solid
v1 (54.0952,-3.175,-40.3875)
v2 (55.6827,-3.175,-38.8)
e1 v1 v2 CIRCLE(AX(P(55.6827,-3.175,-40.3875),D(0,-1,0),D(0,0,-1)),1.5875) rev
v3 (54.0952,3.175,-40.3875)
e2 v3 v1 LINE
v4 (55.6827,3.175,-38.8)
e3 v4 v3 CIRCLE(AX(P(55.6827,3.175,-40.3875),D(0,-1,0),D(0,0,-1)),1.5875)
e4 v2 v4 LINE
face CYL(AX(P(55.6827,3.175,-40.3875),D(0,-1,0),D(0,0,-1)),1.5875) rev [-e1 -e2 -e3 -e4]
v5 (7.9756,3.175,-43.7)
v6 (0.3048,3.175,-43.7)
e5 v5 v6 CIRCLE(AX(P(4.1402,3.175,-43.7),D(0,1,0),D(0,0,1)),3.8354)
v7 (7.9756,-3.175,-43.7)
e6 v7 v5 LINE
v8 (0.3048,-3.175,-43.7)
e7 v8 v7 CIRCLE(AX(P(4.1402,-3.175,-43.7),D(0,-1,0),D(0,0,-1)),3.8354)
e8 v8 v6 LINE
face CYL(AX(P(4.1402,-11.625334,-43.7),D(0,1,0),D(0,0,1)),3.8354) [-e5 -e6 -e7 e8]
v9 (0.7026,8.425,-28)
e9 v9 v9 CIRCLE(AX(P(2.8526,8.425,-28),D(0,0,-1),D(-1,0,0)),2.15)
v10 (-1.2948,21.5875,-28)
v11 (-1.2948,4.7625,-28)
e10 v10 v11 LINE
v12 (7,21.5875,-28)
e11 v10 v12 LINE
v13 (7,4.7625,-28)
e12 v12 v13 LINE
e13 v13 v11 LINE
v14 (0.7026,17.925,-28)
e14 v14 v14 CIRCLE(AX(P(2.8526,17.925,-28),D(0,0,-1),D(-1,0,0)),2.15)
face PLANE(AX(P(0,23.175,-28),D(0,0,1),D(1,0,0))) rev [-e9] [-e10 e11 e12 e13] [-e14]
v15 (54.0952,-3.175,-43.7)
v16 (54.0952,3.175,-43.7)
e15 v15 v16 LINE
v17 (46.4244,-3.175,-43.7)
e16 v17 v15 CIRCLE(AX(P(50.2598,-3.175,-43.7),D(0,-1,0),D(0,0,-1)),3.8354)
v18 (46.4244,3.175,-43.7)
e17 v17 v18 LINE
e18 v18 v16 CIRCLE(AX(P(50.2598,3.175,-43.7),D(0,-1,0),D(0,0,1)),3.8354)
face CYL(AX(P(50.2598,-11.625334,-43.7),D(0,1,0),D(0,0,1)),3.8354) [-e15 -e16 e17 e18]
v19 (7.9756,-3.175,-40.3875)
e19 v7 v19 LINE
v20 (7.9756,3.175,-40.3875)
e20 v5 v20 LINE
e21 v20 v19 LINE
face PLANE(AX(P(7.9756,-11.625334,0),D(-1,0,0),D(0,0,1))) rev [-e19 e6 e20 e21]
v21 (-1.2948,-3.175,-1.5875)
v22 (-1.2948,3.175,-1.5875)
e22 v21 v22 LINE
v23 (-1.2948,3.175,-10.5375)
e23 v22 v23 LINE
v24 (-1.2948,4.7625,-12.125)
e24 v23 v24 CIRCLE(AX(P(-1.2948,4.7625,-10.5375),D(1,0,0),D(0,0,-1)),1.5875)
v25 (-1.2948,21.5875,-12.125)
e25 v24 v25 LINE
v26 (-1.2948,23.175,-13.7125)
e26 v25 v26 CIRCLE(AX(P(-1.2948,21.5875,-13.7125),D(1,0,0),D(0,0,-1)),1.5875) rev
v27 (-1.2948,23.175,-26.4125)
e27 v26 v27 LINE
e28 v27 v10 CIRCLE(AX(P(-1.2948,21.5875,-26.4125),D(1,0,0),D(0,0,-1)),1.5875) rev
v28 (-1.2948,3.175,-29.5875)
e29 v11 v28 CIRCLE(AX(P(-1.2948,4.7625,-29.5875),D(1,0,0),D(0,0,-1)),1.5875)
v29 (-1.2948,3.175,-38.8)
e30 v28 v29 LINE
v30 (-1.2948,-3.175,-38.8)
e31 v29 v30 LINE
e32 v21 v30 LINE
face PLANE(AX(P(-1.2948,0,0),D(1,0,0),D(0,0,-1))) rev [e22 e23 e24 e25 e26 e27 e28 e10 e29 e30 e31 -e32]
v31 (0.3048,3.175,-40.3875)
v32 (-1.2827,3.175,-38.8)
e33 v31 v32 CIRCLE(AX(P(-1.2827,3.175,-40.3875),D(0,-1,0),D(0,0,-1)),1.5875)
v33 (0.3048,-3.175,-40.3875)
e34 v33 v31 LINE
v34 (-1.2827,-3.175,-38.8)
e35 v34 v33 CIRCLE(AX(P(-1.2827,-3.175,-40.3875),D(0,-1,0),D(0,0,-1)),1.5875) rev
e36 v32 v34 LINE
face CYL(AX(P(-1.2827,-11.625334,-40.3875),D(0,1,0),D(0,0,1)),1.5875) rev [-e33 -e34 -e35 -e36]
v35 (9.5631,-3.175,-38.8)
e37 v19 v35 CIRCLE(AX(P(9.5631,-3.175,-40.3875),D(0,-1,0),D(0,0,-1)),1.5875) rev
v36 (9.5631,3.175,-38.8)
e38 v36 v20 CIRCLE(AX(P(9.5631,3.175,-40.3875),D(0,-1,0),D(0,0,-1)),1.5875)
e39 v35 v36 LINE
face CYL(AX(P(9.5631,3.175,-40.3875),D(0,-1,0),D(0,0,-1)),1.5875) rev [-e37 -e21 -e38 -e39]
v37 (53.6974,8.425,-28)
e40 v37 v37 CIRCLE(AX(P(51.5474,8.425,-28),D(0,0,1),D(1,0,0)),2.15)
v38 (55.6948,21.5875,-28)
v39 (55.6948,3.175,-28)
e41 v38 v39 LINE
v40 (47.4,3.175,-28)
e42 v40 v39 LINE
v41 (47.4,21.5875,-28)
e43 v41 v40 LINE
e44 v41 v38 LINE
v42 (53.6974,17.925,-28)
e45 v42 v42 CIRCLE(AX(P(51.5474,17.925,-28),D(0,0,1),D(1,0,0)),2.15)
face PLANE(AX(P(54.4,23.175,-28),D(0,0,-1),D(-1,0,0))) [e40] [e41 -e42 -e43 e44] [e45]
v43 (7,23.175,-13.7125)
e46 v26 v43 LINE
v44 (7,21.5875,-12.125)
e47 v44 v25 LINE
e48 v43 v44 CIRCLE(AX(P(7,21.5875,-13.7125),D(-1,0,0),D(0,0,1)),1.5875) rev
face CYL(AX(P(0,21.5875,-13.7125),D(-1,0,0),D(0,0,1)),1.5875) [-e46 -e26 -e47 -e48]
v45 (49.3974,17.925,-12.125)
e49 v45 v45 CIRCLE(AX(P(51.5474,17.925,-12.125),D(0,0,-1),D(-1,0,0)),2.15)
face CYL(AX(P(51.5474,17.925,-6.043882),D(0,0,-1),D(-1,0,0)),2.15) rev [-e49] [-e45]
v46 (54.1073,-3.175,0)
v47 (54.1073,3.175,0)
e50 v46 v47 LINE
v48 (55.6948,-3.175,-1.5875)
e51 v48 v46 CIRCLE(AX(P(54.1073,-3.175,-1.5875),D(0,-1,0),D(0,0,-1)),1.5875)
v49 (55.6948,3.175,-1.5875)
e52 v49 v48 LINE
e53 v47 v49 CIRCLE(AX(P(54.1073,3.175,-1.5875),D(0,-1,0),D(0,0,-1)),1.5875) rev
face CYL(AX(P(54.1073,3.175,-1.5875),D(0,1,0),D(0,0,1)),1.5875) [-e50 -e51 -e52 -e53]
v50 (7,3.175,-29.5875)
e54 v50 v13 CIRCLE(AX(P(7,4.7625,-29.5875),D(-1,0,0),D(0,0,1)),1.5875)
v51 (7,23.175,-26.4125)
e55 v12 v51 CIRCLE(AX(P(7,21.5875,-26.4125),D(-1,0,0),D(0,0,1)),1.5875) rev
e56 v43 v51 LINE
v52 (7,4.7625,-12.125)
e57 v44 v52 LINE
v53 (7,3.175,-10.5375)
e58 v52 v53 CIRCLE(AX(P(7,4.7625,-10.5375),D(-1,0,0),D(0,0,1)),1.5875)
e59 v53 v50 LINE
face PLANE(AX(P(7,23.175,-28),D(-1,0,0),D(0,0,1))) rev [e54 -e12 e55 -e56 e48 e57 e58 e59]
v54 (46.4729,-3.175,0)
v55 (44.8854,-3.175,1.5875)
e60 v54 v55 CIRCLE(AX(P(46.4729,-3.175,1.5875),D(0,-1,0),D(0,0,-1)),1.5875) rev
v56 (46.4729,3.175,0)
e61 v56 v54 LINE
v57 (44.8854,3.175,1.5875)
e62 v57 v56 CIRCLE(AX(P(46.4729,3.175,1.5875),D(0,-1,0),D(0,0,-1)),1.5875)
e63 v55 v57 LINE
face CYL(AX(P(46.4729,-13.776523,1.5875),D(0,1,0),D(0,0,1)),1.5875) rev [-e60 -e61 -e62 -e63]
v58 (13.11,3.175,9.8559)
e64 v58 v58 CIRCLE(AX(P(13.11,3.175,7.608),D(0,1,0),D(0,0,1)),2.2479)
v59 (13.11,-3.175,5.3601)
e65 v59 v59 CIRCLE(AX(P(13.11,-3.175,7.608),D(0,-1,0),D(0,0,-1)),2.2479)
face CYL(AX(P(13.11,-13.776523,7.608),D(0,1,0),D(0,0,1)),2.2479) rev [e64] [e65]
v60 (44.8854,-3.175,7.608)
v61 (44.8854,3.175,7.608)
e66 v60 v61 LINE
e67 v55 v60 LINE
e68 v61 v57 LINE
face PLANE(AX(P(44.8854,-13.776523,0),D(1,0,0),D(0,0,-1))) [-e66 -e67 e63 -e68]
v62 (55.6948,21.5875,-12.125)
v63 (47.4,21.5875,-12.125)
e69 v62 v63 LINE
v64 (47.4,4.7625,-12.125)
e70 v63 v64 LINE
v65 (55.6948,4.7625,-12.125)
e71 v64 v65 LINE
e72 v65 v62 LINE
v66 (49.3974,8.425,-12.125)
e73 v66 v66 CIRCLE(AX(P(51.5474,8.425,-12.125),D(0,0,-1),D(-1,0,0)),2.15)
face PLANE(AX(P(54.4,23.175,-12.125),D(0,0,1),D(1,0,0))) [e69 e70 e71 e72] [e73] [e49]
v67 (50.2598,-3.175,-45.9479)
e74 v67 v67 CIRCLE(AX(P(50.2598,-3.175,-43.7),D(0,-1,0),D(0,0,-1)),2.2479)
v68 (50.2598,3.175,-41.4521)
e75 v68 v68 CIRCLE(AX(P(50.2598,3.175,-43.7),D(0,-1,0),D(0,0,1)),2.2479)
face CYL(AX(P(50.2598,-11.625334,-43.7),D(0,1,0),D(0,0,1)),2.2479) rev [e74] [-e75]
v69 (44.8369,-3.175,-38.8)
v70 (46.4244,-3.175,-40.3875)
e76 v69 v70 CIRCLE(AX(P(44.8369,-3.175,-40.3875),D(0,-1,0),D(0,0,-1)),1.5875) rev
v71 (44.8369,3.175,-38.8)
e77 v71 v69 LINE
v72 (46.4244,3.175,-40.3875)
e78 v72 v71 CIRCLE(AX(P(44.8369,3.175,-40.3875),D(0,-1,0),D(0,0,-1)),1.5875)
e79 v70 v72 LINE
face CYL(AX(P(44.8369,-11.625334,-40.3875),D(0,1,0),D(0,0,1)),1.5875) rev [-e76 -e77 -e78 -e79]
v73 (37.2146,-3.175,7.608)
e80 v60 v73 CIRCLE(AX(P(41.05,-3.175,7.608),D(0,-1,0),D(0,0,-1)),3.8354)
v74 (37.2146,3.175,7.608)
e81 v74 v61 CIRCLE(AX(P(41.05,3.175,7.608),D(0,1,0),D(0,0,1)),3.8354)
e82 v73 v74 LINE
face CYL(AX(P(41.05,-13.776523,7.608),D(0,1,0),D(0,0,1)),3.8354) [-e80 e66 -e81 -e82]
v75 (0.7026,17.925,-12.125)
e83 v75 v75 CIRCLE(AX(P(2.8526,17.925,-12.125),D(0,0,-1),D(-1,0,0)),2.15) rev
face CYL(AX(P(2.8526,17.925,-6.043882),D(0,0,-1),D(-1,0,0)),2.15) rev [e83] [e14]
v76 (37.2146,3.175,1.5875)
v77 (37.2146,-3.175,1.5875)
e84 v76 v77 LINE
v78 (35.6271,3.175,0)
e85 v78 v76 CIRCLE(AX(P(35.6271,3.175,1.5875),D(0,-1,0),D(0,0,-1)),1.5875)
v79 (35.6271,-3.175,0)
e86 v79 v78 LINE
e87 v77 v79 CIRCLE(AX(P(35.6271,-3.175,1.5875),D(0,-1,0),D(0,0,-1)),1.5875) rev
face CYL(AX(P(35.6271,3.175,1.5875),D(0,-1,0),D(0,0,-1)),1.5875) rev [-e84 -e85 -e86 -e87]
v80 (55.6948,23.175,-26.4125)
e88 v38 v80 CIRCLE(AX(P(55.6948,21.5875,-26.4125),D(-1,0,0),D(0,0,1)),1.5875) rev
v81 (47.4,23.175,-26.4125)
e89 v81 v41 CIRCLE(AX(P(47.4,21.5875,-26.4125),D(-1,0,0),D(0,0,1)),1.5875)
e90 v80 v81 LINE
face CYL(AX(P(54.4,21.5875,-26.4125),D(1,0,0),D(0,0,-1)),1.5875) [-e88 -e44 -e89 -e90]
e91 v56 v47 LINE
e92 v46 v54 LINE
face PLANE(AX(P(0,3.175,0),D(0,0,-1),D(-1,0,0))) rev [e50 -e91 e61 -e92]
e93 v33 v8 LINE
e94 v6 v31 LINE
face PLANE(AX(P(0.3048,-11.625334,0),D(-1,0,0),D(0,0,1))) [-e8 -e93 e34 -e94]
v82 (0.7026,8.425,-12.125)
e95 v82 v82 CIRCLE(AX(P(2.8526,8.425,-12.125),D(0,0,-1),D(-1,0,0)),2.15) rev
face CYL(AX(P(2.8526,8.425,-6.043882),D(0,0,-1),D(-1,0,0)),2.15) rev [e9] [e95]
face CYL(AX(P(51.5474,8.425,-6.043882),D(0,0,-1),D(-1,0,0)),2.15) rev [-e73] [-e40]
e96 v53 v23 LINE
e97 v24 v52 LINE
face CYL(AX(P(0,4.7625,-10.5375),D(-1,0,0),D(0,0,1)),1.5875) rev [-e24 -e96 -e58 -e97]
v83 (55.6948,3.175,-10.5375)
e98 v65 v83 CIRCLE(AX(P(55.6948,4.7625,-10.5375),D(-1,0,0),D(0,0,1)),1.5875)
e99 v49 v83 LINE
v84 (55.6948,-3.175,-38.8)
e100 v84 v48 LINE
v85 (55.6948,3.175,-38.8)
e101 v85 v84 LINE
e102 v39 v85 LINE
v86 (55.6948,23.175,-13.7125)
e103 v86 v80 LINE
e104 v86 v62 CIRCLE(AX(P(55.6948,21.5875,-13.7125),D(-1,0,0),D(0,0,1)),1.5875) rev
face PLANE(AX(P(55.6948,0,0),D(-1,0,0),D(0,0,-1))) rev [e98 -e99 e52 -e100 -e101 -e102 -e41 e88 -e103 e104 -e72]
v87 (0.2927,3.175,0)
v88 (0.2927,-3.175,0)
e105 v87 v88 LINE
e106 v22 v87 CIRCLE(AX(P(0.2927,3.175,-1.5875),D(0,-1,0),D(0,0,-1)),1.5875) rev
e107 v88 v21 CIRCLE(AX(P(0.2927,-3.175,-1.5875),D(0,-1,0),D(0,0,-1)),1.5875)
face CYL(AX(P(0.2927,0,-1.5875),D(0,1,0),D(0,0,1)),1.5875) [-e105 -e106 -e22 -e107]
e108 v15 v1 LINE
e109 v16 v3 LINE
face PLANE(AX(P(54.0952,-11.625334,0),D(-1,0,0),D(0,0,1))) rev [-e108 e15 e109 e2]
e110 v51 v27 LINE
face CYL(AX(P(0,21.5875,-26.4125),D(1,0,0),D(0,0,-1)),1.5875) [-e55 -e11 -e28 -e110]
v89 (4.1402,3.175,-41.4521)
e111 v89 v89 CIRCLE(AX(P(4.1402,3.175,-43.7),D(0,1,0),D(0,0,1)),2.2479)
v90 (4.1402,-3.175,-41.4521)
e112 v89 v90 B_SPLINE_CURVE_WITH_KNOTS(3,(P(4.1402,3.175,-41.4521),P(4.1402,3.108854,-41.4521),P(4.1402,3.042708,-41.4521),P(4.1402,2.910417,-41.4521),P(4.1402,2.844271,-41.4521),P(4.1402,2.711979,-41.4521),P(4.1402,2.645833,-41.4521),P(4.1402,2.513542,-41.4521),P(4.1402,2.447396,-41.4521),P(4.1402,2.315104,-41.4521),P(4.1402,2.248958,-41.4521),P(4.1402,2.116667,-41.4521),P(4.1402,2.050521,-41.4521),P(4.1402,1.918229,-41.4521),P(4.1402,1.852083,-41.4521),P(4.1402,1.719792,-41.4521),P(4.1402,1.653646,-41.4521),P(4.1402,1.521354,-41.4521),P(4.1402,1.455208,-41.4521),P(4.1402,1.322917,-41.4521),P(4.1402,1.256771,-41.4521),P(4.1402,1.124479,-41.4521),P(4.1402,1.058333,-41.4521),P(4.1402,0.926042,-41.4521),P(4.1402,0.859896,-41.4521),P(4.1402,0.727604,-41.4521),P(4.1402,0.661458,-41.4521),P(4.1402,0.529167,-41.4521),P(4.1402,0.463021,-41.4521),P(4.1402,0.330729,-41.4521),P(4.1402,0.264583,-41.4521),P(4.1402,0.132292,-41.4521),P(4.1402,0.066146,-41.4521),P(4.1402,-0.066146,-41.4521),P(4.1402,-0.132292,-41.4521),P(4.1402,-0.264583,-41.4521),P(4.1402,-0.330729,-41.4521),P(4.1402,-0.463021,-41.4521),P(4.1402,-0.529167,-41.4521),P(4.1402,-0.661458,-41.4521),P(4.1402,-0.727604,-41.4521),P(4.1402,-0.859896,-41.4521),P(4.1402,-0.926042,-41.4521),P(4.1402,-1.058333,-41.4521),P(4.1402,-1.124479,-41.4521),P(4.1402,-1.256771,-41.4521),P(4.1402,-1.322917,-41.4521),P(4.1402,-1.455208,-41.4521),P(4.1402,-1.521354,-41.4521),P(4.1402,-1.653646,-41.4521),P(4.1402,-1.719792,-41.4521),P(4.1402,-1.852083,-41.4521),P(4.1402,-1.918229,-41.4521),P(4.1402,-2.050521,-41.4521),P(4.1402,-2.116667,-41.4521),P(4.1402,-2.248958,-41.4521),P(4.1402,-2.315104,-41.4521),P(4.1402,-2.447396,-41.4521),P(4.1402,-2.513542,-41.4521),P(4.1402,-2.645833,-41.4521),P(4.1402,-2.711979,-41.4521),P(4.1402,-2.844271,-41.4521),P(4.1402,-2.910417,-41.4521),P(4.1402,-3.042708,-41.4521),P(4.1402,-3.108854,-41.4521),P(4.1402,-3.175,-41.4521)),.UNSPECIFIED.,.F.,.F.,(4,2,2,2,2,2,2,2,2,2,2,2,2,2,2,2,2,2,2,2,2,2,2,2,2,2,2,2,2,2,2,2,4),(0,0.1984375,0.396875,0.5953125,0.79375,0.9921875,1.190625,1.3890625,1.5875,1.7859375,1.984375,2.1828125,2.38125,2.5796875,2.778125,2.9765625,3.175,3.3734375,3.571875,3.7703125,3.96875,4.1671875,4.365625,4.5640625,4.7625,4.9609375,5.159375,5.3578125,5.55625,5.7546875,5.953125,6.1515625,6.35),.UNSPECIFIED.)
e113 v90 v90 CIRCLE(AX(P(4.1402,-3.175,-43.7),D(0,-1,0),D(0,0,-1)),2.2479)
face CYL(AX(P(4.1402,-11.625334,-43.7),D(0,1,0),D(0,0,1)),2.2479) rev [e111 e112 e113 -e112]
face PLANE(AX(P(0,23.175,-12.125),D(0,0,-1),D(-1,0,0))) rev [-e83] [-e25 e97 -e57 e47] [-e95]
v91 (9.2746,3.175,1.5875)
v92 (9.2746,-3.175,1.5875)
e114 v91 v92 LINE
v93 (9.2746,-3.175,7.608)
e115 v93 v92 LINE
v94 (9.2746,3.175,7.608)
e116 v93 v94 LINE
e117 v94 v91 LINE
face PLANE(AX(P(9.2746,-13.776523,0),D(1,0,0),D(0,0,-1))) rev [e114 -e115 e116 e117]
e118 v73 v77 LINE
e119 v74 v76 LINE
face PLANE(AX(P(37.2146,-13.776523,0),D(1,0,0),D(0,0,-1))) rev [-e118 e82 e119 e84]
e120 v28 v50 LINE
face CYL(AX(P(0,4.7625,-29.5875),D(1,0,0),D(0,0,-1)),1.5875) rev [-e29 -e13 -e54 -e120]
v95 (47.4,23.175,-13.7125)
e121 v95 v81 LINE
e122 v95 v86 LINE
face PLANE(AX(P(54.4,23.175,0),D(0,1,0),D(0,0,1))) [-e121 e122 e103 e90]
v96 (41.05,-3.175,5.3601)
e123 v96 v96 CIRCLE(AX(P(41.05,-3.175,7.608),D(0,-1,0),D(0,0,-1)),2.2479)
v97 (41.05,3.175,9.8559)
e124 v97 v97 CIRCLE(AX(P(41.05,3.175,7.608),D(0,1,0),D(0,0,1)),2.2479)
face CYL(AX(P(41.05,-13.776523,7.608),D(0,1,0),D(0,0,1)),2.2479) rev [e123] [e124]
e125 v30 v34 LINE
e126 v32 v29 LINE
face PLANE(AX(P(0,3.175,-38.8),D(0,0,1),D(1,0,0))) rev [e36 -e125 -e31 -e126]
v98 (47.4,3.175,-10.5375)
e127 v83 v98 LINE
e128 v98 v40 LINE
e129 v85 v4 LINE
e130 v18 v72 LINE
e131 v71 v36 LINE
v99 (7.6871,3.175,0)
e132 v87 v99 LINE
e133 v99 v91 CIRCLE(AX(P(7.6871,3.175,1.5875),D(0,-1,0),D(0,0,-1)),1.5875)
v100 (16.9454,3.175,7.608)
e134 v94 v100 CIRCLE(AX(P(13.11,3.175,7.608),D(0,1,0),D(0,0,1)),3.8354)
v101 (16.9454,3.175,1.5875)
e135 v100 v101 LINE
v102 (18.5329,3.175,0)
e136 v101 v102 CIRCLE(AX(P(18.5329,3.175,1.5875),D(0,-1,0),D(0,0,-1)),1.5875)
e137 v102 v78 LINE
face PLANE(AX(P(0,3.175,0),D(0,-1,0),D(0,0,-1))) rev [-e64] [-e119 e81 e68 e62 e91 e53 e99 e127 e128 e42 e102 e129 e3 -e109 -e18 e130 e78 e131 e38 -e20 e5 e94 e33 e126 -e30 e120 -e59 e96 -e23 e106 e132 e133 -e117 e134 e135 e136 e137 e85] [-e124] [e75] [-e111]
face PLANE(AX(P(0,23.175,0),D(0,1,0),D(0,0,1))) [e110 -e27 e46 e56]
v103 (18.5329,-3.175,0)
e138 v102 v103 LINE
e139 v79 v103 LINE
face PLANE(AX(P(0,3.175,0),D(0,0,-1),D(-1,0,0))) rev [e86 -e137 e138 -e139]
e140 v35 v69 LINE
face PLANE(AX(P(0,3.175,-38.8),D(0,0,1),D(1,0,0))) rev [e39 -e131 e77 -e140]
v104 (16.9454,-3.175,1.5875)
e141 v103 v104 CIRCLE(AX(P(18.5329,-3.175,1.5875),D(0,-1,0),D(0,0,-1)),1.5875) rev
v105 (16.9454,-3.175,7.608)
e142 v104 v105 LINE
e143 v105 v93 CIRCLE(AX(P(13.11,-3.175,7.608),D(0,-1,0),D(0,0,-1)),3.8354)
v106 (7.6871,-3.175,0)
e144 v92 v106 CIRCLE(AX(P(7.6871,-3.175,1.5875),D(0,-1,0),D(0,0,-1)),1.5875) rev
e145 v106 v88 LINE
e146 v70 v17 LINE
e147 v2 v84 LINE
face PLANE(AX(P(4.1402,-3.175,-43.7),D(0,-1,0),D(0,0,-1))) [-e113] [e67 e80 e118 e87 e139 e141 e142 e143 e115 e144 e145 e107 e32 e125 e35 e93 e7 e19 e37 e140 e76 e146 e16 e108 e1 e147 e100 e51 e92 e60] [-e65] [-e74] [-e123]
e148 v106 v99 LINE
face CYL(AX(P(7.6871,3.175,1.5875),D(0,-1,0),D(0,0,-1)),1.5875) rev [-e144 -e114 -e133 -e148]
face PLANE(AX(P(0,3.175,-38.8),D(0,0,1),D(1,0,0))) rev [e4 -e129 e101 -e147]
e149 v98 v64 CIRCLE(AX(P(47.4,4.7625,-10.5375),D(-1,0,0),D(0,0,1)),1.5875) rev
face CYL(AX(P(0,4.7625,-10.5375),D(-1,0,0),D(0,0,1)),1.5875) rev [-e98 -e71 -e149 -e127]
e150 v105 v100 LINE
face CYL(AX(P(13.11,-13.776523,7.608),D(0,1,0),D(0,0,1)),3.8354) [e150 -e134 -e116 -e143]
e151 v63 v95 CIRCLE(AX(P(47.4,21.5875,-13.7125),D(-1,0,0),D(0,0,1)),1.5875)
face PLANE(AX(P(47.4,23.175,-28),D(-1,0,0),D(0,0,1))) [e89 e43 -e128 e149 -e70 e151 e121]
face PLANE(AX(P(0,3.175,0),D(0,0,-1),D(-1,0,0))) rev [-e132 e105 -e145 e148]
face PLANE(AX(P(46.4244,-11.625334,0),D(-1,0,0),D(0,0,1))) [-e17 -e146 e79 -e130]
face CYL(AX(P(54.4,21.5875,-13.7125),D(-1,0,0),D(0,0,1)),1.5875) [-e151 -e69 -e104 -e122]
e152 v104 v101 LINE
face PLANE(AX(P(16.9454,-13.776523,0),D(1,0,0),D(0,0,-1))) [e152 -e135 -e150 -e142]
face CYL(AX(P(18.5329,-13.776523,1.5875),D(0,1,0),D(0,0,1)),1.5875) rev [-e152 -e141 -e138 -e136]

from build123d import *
from build123d.topology import SkipClean

# Parameters (mm, degrees)
SKETCH1_W           = 54.4
SKETCH1_H           = 38.8
BOSS_EXTRUDE1_DEPTH = 3.175
SKETCH2_W           = 7
SKETCH2_H           = 15.875
BOSS_EXTRUDE2_DEPTH = 20
SKETCH3_R           = 3.8354
SKETCH3_R_2         = 2.2479
BOSS_EXTRUDE3_DEPTH = 3.175
LPATTERN1_COUNT     = 2
LPATTERN1_PITCH     = 27.94
SKETCH6_R           = 3.8354
SKETCH6_R_2         = 2.2479
BOSS_EXTRUDE6_DEPTH = 3.175
SKETCH7_R           = 2.150000018
CUT_EXTRUDE1_DEPTH  = 15.875
BOSS_EXTRUDE7_DEPTH = 1.2948
SKETCH11_R          = 2.2479
BOSS_EXTRUDE8_DEPTH = 3.175
FILLET1_R           = 1.5875


with BuildPart() as part:
    # Sketch1 → Boss-Extrude1 (new body)
    with BuildSketch(Plane(origin=(0, 0, 0), x_dir=(1, 0, 0), z_dir=(0, 1, 0))):
        with Locations((27.2, 19.4)):
            Rectangle(SKETCH1_W, SKETCH1_H)
    extrude(amount=BOSS_EXTRUDE1_DEPTH)

    # Sketch2 → Boss-Extrude2 (add)
    with BuildSketch(Plane(origin=(0, 3.175, 0), x_dir=(1, 0, 0), z_dir=(0, 1, 0))):
        with Locations((3.5, 20.0625)):
            Rectangle(SKETCH2_W, SKETCH2_H)
    boss_extrude2 = extrude(amount=BOSS_EXTRUDE2_DEPTH)

    # Mirror1: Boss-Extrude2 across plane
    add(boss_extrude2.mirror(Plane.ZY.offset(-27.2)))

    # Sketch3 → Boss-Extrude3 (add)
    # profile 1 of 2: a face of its own
    with BuildSketch(Plane(origin=(0, 3.175, 0), x_dir=(1, 0, 0), z_dir=(0, 1, 0))):
        with Locations((13.109999942, -7.608)):
            Circle(SKETCH3_R)
        with Locations(Location((13.109999942, -7.608, 0), (0, 0, 270))):
            Circle(SKETCH3_R_2, mode=Mode.SUBTRACT)
    # profile 2 of 2: a face of its own
    with BuildSketch(Plane(origin=(0, 3.175, 0), x_dir=(1, 0, 0), z_dir=(0, 1, 0))):
        with BuildLine():
            Line((9.274599942, 0), (9.274599942, -7.608))
            ThreePointArc((9.274599942, -7.608), (13.109999942, -3.7726), (16.945399942, -7.608))
            Line((16.945399942, -7.608), (16.945399942, 0))
            Line((16.945399942, 0), (9.274599942, 0))
        make_face()
    boss_extrude3 = extrude(amount=-BOSS_EXTRUDE3_DEPTH)

    # LPattern1: Boss-Extrude3 ×2
    with Locations(*[(i * LPATTERN1_PITCH, 0, 0) for i in range(1, LPATTERN1_COUNT)]):
        add(boss_extrude3)

    # Sketch6 → Boss-Extrude6 (add)
    # profile 1 of 2: a face of its own
    with BuildSketch(Plane(origin=(0, 3.175, 0), x_dir=(1, 0, 0), z_dir=(0, 1, 0))):
        with Locations((4.1402, 43.7)):
            Circle(SKETCH6_R)
        with Locations(Location((4.1402, 43.7, 0), (0, 0, 270))):
            Circle(SKETCH6_R_2, mode=Mode.SUBTRACT)
    # profile 2 of 2: a face of its own
    with BuildSketch(Plane(origin=(0, 3.175, 0), x_dir=(1, 0, 0), z_dir=(0, 1, 0))):
        with BuildLine():
            ThreePointArc((7.9756, 43.7), (4.1402, 39.8646), (0.3048, 43.7))
            Line((0.3048, 43.7), (0.3048, 38.8))
            Line((0.3048, 38.8), (7.9756, 38.8))
            Line((7.9756, 38.8), (7.9756, 43.7))
        make_face()
    boss_extrude6 = extrude(amount=-BOSS_EXTRUDE6_DEPTH)

    # Mirror3: Boss-Extrude6 across plane
    add(boss_extrude6.mirror(Plane.ZY.offset(-27.2)))

    # Sketch7 → Cut-Extrude1 (cut)
    with BuildSketch(Plane(origin=(0, 0, -28), x_dir=(-1, 0, 0), z_dir=(0, 0, -1))):
        with Locations((-2.852600116, 17.925)):
            Circle(SKETCH7_R)
        with Locations((-2.852600116, 8.425)):
            Circle(SKETCH7_R)
    cut_extrude1 = extrude(amount=-CUT_EXTRUDE1_DEPTH, mode=Mode.SUBTRACT)

    # Sketch9 → Boss-Extrude7 (add)
    with BuildSketch(Plane.ZY):
        Polygon((-38.8, 0), (-38.8, 3.175), (-28, 3.175), (-28, 23.175), (-12.125, 23.175), (-12.125, 3.175), (0, 3.175), (0, 0), align=None)
    boss_extrude7 = extrude(amount=BOSS_EXTRUDE7_DEPTH)

    # Mirror4: Boss-Extrude7 across plane
    add(boss_extrude7.mirror(Plane.ZY.offset(-27.2)))

    # Mirror5: Cut-Extrude1 across plane
    add(cut_extrude1.mirror(Plane.ZY.offset(-27.2)), mode=Mode.SUBTRACT)

    # Sketch11 → Boss-Extrude8 (add)
    with SkipClean():  # the faces are left unmerged after this step: merging them gives an invalid solid
        with BuildSketch(Plane.XZ):
            with BuildLine():
                Line((0.3048, -38.8), (0.3048, -43.7))
                ThreePointArc((0.3048, -43.7), (4.1402, -47.5354), (7.9756, -43.7))
                Line((7.9756, -43.7), (7.9756, -38.8))
                Line((7.9756, -38.8), (46.4244, -38.8))
                Line((46.4244, -38.8), (46.4244, -43.7))
                ThreePointArc((46.4244, -43.7), (50.2598, -47.5354), (54.0952, -43.7))
                Line((54.0952, -43.7), (54.0952, -38.8))
                Line((54.0952, -38.8), (55.6948, -38.8))
                Line((55.6948, -38.8), (55.6948, 0))
                Line((55.6948, 0), (44.885399942, 0))
                Line((44.885399942, 0), (44.885399942, 7.608))
                ThreePointArc((44.885399942, 7.608), (41.049999942, 11.4434), (37.214599942, 7.608))
                Line((37.214599942, 7.608), (37.214599942, 0))
                Line((37.214599942, 0), (16.945399942, 0))
                Line((16.945399942, 0), (16.945399942, 7.608))
                ThreePointArc((16.945399942, 7.608), (13.109999942, 11.4434), (9.274599942, 7.608))
                Line((9.274599942, 7.608), (9.274599942, 0))
                Line((9.274599942, 0), (-1.2948, 0))
                Line((-1.2948, 0), (-1.2948, -38.8))
                Line((-1.2948, -38.8), (0.3048, -38.8))
            make_face()
            with Locations(Location((4.1402, -43.7, 0), (0, 0, 90))):
                Circle(SKETCH11_R, mode=Mode.SUBTRACT)
            with Locations(Location((50.2598, -43.7, 0), (0, 0, 90))):
                Circle(SKETCH11_R, mode=Mode.SUBTRACT)
            with Locations(Location((41.049999942, 7.608, 0), (0, 0, 90))):
                Circle(SKETCH11_R, mode=Mode.SUBTRACT)
            with Locations(Location((13.109999942, 7.608, 0), (0, 0, 90))):
                Circle(SKETCH11_R, mode=Mode.SUBTRACT)
        extrude(amount=BOSS_EXTRUDE8_DEPTH)
    add(part.part.scale(1), mode=Mode.REPLACE)  # the faces are merged on a copy

    # Fillet1
    fillet1_edges = [part.edges().sort_by_distance(p)[0] for p in [
        (-1.2948, 0, 0),
        (55.6948, 0, 0),
        (2.8526, 3.175, -12.125),
        (2.8526, 3.175, -28),
        (2.8526, 23.175, -12.125),
        (2.8526, 23.175, -28),
        (51.5474, 23.175, -28),
        (51.5474, 23.175, -12.125),
        (51.5474, 3.175, -12.125),
        (16.945399942, 0, 0),
        (9.274599942, 0, 0),
        (44.885399942, 0, 0),
        (37.214599942, 0, 0),
        (0.3048, 0, -38.8),
        (7.9756, 0, -38.8),
        (46.4244, 0, -38.8),
        (54.0952, 0, -38.8),
    ]]
    fillet(fillet1_edges, radius=FILLET1_R)


solid = part.part
